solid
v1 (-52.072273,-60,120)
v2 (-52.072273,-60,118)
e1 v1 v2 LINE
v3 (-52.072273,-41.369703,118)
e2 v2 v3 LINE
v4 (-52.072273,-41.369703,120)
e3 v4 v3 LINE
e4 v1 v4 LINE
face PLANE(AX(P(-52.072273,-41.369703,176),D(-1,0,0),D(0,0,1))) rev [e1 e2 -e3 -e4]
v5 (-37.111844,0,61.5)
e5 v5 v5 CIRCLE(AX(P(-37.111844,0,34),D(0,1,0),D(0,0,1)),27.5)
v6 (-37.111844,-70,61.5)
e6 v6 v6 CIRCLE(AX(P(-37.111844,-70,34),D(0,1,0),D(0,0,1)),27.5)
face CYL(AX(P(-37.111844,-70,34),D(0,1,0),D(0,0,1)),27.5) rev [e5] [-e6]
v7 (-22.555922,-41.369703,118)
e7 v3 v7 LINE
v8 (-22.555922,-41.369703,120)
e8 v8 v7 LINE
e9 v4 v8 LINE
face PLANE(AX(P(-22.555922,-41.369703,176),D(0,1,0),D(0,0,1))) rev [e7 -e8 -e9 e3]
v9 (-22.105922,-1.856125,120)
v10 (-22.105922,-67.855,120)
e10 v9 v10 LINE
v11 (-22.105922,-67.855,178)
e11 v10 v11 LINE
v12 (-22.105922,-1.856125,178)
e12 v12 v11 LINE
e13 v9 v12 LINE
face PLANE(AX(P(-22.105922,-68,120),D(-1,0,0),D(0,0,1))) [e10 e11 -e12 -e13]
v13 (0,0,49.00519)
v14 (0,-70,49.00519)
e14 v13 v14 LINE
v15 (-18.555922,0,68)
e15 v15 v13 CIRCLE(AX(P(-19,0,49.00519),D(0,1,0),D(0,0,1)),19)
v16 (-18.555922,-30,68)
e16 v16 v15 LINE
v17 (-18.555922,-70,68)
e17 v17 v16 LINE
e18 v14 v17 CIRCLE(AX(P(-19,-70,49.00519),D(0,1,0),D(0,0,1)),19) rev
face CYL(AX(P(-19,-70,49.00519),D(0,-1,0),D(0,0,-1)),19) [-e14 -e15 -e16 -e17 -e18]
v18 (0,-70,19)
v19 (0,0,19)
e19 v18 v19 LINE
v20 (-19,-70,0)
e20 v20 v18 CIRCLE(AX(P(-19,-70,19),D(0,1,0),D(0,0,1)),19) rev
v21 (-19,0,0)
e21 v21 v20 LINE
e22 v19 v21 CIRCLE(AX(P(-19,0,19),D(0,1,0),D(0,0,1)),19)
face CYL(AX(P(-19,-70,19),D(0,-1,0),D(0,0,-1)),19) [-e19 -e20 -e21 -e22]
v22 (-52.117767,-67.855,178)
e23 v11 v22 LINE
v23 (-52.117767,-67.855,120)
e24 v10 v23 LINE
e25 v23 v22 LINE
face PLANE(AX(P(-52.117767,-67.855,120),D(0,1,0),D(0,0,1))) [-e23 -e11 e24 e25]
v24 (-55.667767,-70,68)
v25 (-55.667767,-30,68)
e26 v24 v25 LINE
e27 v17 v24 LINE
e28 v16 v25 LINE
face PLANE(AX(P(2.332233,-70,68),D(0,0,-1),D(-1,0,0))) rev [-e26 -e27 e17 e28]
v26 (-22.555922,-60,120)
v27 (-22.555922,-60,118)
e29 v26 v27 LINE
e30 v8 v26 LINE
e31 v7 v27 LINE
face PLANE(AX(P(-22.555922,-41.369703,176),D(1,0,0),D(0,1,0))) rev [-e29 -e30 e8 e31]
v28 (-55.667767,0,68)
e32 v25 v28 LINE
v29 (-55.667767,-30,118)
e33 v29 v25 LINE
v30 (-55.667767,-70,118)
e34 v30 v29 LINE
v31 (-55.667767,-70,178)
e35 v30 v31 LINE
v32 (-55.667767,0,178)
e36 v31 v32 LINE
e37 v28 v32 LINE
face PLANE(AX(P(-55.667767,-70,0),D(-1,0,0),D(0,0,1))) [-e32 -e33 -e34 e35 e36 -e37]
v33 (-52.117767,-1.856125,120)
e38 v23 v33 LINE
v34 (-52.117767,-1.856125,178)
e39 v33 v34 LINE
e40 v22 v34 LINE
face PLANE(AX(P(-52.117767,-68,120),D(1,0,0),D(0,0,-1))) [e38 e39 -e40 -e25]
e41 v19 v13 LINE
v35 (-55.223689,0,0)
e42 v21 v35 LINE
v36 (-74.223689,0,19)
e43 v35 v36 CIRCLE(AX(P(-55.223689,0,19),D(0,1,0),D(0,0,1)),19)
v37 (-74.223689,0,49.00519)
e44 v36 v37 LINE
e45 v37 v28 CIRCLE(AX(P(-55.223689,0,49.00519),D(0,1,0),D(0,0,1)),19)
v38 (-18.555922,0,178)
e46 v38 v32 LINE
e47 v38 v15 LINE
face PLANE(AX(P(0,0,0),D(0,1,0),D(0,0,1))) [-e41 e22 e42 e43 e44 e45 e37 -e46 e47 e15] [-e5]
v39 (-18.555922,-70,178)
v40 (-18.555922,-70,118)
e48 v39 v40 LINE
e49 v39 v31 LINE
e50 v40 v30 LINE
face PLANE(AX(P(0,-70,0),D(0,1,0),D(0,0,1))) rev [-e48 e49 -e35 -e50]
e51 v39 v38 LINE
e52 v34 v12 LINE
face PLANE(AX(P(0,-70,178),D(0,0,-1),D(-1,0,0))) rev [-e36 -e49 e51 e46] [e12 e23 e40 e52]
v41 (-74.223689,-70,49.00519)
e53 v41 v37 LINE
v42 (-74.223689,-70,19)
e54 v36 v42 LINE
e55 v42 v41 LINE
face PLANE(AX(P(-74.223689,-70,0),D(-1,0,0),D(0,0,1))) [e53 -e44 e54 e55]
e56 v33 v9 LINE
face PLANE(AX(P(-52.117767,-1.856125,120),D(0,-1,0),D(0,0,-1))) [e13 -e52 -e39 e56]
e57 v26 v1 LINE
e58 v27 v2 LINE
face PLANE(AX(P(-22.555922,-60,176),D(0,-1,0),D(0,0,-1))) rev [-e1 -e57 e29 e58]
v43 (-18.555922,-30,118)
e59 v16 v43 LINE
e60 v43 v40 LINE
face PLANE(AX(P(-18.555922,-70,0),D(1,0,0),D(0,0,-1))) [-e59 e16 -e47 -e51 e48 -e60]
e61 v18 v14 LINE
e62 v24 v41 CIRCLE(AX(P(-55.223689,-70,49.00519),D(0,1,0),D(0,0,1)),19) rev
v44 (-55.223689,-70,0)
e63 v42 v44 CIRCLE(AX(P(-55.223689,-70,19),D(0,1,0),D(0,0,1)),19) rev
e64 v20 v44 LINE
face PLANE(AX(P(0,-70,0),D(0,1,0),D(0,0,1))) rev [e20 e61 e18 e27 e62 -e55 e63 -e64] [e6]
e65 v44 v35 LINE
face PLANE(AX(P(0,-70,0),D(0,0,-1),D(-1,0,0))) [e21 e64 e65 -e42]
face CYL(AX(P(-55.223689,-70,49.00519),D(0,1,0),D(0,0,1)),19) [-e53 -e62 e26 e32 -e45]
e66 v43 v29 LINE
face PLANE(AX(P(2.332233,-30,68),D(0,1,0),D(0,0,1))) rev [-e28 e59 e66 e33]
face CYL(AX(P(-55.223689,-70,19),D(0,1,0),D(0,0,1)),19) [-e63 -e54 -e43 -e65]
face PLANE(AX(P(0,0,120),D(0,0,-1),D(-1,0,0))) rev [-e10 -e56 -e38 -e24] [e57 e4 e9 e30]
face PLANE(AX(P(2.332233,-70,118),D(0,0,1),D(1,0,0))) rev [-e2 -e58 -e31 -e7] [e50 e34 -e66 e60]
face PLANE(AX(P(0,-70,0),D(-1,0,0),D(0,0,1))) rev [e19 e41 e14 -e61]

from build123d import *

# Parameters (mm, degrees)
SKETCH1_W           = 74.22368895
SKETCH1_H           = 68
SKETCH1_W_2         = 37.111844475
SKETCH1_H_2         = 52
SKETCH1_H_3         = 58
BOSS_EXTRUDE1_DEPTH = 70
SKETCH2_R           = 27.5
CUT_EXTRUDE1_DEPTH  = 70
FILLET1_R           = 19
SKETCH3_W           = 33.111844475
SKETCH3_H           = 64.288874977
CUT_EXTRUDE2_DEPTH  = 58
SKETCH5_W           = 50
SKETCH5_H           = 40
CUT_EXTRUDE3_DEPTH  = 58
SKETCH7_W           = 29.516350972
SKETCH7_H           = 18.630296647
CUT_EXTRUDE5_DEPTH  = 58
SKETCH8_W           = 33.111844475
SKETCH8_H           = 2
CUT_EXTRUDE6_DEPTH  = 58
SKETCH9_W           = 1.55
SKETCH9_H           = 66.288874977
BOSS_EXTRUDE2_DEPTH = 58
SKETCH10_W          = 30.011844475
SKETCH10_H          = 0.145
BOSS_EXTRUDE3_DEPTH = 58


with BuildPart() as part:
    # Sketch1 → Boss-Extrude1 (new body)
    with BuildSketch(Plane(origin=(0, 0, 0), x_dir=(1, 0, 0), z_dir=(0, 1, 0))):
        with Locations((-37.111844475, -34)):
            Rectangle(SKETCH1_W, SKETCH1_H)
        with Locations((-37.111844475, -94)):
            Rectangle(SKETCH1_W_2, SKETCH1_H_2)
        with Locations((-37.111844475, -149)):
            Rectangle(SKETCH1_W_2, SKETCH1_H_3)
    extrude(amount=-BOSS_EXTRUDE1_DEPTH)

    # Sketch2 → Cut-Extrude1 (cut)
    with BuildSketch(Plane(origin=(0, 0, 0), x_dir=(1, 0, 0), z_dir=(0, 1, 0))):
        with Locations(Location((-37.111844475, -34, 0), (0, 0, 270))):
            Circle(SKETCH2_R)
    extrude(amount=-CUT_EXTRUDE1_DEPTH, mode=Mode.SUBTRACT)

    # Fillet1
    # the kernel refuses this fillet: 19 mm, written as the material it takes off along each edge
    with BuildSketch(Plane(origin=(0, 47.487024211, 68), x_dir=(0, 0, -1), z_dir=(0, -1, 0))) as fillet1_piece_1:
        with BuildLine():
            CenterArc((18.994809684, -19), FILLET1_R, 90, 88.660731648)
            Line((0, -18.555922237), (-0.379896194, -18.547040682))
            ThreePointArc((-0.379896194, -18.547040682), (-0.38, -9.277961119), (-0.38, 0))
            Line((-0.38, 0), (0, 0.38))
            Line((0, 0.38), (18.994809684, 0.38))
            Line((18.994809684, 0.38), (18.994809684, 0))
        make_face()
    extrude(amount=164.974048421, mode=Mode.SUBTRACT)
    with BuildSketch(Plane(origin=(0, 47.5, 0), x_dir=(-1, 0, 0), z_dir=(0, -1, 0))) as fillet1_piece_2:
        with BuildLine():
            CenterArc((FILLET1_R, -FILLET1_R), FILLET1_R, 90, 90)
            Line((0, -FILLET1_R), (-FILLET1_R * 0.02, -FILLET1_R))
            Line((-FILLET1_R * 0.02, -FILLET1_R), (-FILLET1_R * 0.02, FILLET1_R * 0.02))
            Line((-FILLET1_R * 0.02, FILLET1_R * 0.02), (FILLET1_R, FILLET1_R * 0.02))
            Line((FILLET1_R, FILLET1_R * 0.02), (FILLET1_R, 0))
        make_face()
    extrude(amount=165, mode=Mode.SUBTRACT)
    with BuildSketch(Plane(origin=(-74.22368895, 47.487024211, 68), x_dir=(0, 0, -1), z_dir=(0, -1, 0))) as fillet1_piece_3:
        with BuildLine():
            CenterArc((18.994809684, 19), FILLET1_R, 181.339268352, 88.660731648)
            Line((0, 18.555922237), (-0.379896194, 18.547040682))
            ThreePointArc((-0.379896194, 18.547040682), (-0.38, 9.277961119), (-0.38, 0))
            Line((-0.38, 0), (0, -0.38))
            Line((0, -0.38), (18.994809684, -0.38))
            Line((18.994809684, -0.38), (18.994809684, 0))
        make_face()
    extrude(amount=164.974048421, mode=Mode.SUBTRACT)
    with BuildSketch(Plane(origin=(-74.22368895, 47.5, 0), x_dir=(1, 0, 0), z_dir=(0, -1, 0))) as fillet1_piece_4:
        with BuildLine():
            CenterArc((FILLET1_R, FILLET1_R), FILLET1_R, 180, 90)
            Line((0, FILLET1_R), (-FILLET1_R * 0.02, FILLET1_R))
            Line((-FILLET1_R * 0.02, FILLET1_R), (-FILLET1_R * 0.02, -FILLET1_R * 0.02))
            Line((-FILLET1_R * 0.02, -FILLET1_R * 0.02), (FILLET1_R, -FILLET1_R * 0.02))
            Line((FILLET1_R, -FILLET1_R * 0.02), (FILLET1_R, 0))
        make_face()
    extrude(amount=165, mode=Mode.SUBTRACT)

    # Sketch3 → Cut-Extrude2 (cut)
    with BuildSketch(Plane.XY.offset(178)):
        with Locations((-37.111844475, -35.855562511)):
            Rectangle(SKETCH3_W, SKETCH3_H)
    extrude(amount=-CUT_EXTRUDE2_DEPTH, mode=Mode.SUBTRACT)

    # Sketch5 → Cut-Extrude3 (cut)
    with BuildSketch(Plane.ZY.offset(55.667766712)):
        with Locations((93, -50)):
            Rectangle(SKETCH5_W, SKETCH5_H)
    extrude(amount=-CUT_EXTRUDE3_DEPTH, mode=Mode.SUBTRACT)

    # Sketch7 → Cut-Extrude5 (cut)
    with BuildSketch(Plane(origin=(0, 0, 118), x_dir=(-1, 0, 0), z_dir=(0, 0, -1))):
        with Locations((37.314097723, -50.684851677)):
            Rectangle(SKETCH7_W, SKETCH7_H)
    extrude(amount=-CUT_EXTRUDE5_DEPTH, mode=Mode.SUBTRACT)

    # Sketch8 → Cut-Extrude6 (cut)
    with BuildSketch(Plane.XY.offset(178)):
        with Locations((-37.111844475, -2.711125023)):
            Rectangle(SKETCH8_W, SKETCH8_H)
    extrude(amount=-CUT_EXTRUDE6_DEPTH, mode=Mode.SUBTRACT)

    # Sketch9 → Boss-Extrude2 (add)
    with BuildSketch(Plane.XY.offset(178)):
        with Locations((-52.892766712, -34.855562511)):
            Rectangle(SKETCH9_W, SKETCH9_H)
        with Locations((-21.330922237, -34.855562511)):
            Rectangle(SKETCH9_W, SKETCH9_H)
    extrude(amount=-BOSS_EXTRUDE2_DEPTH)

    # Sketch10 → Boss-Extrude3 (add)
    with BuildSketch(Plane.XY.offset(178)):
        with Locations((-37.111844475, -67.9275)):
            Rectangle(SKETCH10_W, SKETCH10_H)
        with Locations((-37.111844475, -1.783625023)):
            Rectangle(SKETCH10_W, SKETCH10_H)
    extrude(amount=-BOSS_EXTRUDE3_DEPTH)


solid = part.part
